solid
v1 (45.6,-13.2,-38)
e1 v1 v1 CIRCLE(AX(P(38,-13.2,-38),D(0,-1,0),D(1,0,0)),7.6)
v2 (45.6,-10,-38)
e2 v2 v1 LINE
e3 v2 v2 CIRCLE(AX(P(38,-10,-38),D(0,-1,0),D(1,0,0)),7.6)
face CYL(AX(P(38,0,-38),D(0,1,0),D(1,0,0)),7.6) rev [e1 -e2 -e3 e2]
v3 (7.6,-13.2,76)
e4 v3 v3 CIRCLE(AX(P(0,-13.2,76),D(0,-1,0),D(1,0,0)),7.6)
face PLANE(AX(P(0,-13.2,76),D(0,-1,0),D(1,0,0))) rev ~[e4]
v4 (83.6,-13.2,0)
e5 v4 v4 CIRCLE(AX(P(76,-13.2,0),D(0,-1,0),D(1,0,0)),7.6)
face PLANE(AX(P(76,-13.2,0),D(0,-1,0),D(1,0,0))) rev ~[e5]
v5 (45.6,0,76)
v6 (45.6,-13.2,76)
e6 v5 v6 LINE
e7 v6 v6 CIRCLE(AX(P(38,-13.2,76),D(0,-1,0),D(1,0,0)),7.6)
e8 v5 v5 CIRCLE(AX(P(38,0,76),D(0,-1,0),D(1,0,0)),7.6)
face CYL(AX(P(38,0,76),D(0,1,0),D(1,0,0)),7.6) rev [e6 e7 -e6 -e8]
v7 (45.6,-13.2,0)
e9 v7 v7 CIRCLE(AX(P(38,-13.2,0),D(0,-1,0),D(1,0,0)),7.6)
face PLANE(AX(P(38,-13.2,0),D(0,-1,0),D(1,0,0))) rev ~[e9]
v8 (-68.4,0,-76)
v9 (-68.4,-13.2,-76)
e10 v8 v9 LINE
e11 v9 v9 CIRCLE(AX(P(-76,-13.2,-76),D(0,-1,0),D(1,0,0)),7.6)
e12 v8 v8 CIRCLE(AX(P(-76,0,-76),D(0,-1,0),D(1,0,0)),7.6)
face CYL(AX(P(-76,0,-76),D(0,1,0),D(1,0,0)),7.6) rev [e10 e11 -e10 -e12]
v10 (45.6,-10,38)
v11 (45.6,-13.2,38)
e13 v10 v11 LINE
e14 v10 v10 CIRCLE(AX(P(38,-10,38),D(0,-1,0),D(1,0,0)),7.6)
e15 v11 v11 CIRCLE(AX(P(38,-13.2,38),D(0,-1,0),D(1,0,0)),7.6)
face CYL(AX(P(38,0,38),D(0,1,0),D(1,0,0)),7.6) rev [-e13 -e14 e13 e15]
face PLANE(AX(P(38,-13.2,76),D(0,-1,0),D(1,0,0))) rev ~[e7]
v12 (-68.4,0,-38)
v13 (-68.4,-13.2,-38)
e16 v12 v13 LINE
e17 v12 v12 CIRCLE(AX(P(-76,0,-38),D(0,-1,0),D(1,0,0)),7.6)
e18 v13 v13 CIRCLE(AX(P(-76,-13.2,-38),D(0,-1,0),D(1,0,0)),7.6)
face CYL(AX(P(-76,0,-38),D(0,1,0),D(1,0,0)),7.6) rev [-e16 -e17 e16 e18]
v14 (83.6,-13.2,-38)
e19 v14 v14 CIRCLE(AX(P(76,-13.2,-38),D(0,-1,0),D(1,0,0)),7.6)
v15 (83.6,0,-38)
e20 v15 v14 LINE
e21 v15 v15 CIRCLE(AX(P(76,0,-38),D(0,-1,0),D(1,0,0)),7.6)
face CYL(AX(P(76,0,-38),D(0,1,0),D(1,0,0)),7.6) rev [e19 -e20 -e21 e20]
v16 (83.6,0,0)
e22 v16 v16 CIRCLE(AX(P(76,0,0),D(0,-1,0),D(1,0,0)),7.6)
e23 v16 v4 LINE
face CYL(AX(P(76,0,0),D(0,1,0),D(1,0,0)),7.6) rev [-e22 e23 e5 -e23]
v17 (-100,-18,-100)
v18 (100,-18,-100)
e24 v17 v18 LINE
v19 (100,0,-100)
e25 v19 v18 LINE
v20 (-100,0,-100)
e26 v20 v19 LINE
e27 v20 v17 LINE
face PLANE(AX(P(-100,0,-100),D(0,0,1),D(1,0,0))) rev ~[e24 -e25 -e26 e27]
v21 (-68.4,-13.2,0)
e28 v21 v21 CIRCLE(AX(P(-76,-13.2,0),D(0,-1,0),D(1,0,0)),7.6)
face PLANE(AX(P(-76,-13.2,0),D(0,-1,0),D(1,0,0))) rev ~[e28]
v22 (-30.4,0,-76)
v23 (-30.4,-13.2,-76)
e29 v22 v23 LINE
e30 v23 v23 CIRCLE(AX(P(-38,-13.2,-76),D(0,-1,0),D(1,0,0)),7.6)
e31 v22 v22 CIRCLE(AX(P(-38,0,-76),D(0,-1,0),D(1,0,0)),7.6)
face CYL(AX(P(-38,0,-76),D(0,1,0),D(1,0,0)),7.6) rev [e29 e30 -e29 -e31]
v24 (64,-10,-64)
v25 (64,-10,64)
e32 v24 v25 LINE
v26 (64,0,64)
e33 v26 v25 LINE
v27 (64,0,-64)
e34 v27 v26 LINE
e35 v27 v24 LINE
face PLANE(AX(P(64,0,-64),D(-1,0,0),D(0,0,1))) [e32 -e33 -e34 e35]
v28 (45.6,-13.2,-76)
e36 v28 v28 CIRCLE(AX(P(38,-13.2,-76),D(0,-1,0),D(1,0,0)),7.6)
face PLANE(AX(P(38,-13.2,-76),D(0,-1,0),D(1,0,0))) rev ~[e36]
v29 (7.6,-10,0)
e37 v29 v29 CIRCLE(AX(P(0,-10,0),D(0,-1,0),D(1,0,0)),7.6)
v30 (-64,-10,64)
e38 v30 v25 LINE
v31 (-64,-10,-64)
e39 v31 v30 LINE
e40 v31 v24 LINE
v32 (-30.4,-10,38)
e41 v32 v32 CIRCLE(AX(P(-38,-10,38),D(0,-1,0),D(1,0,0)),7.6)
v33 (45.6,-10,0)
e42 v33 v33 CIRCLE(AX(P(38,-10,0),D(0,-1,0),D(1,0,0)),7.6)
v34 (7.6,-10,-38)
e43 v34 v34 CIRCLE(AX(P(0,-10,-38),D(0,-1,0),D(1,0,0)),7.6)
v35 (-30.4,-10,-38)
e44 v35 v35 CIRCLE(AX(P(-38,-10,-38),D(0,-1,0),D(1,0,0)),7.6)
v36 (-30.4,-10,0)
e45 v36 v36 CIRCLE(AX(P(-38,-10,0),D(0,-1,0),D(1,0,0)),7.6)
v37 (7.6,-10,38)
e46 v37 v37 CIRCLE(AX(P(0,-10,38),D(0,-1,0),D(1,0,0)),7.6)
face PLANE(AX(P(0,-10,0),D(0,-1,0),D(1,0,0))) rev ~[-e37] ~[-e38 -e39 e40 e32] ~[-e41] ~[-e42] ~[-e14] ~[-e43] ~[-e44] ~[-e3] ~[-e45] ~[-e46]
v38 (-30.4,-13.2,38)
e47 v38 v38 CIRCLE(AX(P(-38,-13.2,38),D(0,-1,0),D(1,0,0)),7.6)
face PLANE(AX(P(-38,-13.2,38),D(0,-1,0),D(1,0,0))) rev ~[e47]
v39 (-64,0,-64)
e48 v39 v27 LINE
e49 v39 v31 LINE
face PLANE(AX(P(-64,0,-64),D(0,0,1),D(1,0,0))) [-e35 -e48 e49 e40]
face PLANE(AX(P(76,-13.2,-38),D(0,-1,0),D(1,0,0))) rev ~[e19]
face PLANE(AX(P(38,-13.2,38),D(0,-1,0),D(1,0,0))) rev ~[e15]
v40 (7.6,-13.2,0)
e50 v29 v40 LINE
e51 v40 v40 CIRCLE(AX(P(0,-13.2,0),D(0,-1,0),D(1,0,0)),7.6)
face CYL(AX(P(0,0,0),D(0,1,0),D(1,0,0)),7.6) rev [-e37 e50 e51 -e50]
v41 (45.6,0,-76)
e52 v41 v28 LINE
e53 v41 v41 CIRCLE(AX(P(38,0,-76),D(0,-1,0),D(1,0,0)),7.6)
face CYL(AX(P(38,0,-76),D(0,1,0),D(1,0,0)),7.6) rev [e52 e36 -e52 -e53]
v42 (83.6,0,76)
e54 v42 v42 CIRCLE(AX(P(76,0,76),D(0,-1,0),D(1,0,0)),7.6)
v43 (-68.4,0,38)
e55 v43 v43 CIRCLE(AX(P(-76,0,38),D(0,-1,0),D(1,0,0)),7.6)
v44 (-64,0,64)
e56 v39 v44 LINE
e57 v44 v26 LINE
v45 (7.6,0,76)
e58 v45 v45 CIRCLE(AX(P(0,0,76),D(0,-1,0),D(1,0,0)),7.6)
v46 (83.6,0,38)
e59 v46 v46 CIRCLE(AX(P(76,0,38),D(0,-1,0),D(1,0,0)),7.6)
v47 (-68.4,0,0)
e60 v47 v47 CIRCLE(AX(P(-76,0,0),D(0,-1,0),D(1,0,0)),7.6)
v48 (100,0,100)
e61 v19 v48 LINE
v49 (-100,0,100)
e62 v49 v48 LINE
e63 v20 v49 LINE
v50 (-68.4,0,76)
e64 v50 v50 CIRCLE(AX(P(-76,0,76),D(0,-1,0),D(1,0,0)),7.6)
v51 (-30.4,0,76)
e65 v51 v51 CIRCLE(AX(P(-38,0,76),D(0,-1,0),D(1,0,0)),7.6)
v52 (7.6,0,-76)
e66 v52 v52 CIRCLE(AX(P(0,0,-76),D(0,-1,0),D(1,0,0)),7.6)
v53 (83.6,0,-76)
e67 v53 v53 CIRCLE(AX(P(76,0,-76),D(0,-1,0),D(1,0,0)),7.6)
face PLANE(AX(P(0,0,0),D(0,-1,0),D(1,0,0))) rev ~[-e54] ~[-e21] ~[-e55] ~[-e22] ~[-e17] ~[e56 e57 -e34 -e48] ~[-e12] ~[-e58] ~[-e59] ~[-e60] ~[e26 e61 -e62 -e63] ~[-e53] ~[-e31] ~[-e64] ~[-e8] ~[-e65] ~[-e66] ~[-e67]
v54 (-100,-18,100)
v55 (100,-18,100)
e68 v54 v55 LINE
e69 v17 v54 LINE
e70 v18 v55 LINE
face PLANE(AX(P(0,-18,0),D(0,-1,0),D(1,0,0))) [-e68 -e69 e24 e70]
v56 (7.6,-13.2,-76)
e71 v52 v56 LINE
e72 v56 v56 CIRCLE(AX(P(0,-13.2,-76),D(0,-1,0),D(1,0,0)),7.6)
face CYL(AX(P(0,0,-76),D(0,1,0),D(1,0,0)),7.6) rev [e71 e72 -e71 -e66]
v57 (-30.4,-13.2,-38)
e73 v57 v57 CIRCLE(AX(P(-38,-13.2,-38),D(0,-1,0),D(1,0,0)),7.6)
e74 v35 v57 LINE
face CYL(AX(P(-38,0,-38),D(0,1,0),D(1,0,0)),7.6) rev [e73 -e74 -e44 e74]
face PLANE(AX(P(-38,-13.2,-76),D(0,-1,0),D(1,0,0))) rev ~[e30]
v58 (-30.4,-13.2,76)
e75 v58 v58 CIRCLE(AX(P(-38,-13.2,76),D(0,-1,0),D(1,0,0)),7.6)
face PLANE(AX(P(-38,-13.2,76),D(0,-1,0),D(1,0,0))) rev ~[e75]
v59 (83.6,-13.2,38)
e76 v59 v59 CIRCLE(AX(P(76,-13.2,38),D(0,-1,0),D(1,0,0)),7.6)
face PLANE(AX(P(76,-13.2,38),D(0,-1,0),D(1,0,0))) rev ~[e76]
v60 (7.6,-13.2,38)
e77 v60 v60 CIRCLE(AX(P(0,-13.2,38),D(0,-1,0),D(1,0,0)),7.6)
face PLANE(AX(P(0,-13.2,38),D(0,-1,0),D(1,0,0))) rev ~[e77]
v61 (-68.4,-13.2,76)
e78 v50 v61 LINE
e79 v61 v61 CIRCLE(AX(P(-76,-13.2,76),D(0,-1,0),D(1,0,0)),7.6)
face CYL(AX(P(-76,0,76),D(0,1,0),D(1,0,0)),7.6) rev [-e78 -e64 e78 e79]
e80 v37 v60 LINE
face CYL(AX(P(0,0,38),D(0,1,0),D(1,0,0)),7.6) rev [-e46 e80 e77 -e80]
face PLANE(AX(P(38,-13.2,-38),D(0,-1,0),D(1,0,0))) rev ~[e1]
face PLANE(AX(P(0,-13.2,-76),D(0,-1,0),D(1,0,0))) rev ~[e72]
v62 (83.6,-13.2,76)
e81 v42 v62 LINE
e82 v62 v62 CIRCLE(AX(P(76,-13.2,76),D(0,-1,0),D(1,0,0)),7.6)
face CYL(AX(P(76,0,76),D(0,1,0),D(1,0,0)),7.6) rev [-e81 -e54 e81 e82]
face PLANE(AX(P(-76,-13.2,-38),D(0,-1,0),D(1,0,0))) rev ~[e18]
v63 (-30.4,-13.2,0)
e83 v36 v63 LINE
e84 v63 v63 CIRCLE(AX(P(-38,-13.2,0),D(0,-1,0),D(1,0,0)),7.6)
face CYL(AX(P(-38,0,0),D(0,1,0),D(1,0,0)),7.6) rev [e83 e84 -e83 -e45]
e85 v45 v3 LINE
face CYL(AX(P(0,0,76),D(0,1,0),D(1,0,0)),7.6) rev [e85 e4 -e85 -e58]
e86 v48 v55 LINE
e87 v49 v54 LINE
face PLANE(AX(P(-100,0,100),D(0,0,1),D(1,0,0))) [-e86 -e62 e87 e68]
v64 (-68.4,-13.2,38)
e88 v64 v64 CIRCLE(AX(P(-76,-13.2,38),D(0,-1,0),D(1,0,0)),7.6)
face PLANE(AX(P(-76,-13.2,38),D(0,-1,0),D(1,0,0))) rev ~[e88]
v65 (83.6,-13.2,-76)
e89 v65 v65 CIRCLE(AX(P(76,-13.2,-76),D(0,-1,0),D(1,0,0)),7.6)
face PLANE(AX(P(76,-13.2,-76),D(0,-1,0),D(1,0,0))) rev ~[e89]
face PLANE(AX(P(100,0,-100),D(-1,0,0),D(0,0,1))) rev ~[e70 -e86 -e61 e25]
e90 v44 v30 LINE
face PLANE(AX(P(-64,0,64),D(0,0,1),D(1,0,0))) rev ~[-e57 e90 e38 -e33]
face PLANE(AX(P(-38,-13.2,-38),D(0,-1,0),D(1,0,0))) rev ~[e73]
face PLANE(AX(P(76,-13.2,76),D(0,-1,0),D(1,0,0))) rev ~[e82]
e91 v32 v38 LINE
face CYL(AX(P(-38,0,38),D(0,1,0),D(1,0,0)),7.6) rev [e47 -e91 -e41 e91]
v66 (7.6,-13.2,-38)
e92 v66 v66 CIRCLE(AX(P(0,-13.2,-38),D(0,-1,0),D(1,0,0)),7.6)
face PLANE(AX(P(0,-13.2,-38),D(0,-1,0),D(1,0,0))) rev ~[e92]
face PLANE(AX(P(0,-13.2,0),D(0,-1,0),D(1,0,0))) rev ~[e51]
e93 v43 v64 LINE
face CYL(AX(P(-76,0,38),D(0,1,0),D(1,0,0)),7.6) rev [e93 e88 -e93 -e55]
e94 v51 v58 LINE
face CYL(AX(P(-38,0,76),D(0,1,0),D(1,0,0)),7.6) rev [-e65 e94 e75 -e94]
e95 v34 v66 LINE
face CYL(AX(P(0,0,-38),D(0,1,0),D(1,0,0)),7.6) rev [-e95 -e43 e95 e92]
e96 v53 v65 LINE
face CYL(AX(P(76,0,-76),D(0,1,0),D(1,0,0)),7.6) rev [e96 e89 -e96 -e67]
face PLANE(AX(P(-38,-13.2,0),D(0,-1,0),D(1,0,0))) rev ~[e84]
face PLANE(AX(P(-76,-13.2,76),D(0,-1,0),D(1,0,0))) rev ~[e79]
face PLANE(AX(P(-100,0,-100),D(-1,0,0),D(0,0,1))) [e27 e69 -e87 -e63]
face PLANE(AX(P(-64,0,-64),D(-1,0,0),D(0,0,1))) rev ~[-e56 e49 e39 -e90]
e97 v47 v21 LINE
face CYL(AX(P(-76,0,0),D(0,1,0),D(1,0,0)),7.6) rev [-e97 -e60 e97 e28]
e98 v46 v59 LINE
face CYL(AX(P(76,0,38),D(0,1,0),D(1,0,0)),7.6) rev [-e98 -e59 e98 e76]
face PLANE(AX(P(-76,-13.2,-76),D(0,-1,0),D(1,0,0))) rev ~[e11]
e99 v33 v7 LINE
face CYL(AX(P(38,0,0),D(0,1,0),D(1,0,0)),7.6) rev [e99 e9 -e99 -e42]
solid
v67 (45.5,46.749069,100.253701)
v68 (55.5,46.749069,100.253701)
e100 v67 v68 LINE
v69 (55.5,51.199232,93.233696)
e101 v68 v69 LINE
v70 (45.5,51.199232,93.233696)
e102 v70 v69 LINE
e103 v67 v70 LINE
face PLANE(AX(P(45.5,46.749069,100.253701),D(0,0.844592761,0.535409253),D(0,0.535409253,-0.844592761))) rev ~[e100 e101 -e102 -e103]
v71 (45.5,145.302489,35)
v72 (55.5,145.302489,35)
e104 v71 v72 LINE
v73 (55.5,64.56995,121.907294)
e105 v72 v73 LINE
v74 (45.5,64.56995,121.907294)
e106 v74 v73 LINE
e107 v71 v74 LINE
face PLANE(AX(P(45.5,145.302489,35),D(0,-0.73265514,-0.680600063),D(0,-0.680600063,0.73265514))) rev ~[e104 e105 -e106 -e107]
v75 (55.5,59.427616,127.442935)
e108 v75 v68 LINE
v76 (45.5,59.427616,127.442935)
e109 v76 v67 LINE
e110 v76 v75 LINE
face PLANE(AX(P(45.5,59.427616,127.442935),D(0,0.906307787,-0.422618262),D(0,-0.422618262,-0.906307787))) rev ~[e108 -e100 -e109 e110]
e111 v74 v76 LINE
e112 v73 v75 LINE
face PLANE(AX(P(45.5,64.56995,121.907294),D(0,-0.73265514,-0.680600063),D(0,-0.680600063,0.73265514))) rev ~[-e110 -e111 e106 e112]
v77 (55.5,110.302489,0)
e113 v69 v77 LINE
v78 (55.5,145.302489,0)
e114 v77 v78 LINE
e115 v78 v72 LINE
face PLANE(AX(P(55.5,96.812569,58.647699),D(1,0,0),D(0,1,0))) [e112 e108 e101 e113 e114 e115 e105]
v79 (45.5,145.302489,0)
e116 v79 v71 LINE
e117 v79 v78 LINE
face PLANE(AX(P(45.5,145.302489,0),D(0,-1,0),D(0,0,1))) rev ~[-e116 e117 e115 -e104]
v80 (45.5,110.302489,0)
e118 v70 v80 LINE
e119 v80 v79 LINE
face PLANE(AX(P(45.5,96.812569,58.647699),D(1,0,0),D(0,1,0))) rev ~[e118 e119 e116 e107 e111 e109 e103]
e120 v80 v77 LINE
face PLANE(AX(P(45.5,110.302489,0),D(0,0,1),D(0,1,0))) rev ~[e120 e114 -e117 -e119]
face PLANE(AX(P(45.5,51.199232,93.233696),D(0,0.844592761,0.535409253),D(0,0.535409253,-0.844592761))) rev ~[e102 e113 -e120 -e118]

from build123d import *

# Parameters (mm, degrees)
F0_W     = 200
F0_H     = 200
F0_R     = 7.6
F0_W_2   = 128
F0_H_2   = 128
F1_DEPTH = 18
F2_DEPTH = 10
F3_DEPTH = 13.2
F5_START = 45.5
F5_DEPTH = 10


# Not quite as in the source:
# - a feature names something its author has since deleted; it is built from what else it names


with BuildPart() as f1:
    # F0 (on Front) → F1 (new body)
    with BuildSketch(Plane.XZ):
        Rectangle(F0_W, F0_H)
        with Locations((-76, -76)):
            Circle(F0_R, mode=Mode.SUBTRACT)
        with Locations((-38, -76)):
            Circle(F0_R, mode=Mode.SUBTRACT)
        with Locations((-76, -38)):
            Circle(F0_R, mode=Mode.SUBTRACT)
        with Locations((0, -76)):
            Circle(F0_R, mode=Mode.SUBTRACT)
        with Locations((38, -76)):
            Circle(F0_R, mode=Mode.SUBTRACT)
        with Locations((76, -76)):
            Circle(F0_R, mode=Mode.SUBTRACT)
        with Locations((76, -38)):
            Circle(F0_R, mode=Mode.SUBTRACT)
        with Locations((-76, 0)):
            Circle(F0_R, mode=Mode.SUBTRACT)
        with Locations((-76, 38)):
            Circle(F0_R, mode=Mode.SUBTRACT)
        with Locations((-76, 76)):
            Circle(F0_R, mode=Mode.SUBTRACT)
        with Locations((-38, 76)):
            Circle(F0_R, mode=Mode.SUBTRACT)
        Rectangle(F0_W_2, F0_H_2, mode=Mode.SUBTRACT)
        with Locations((76, 0)):
            Circle(F0_R, mode=Mode.SUBTRACT)
        with Locations((76, 38)):
            Circle(F0_R, mode=Mode.SUBTRACT)
        with Locations((0, 76)):
            Circle(F0_R, mode=Mode.SUBTRACT)
        with Locations((38, 76)):
            Circle(F0_R, mode=Mode.SUBTRACT)
        with Locations((76, 76)):
            Circle(F0_R, mode=Mode.SUBTRACT)
        Rectangle(F0_W_2, F0_H_2)
        with Locations((-38, -38)):
            Circle(F0_R, mode=Mode.SUBTRACT)
        with Locations((0, -38)):
            Circle(F0_R, mode=Mode.SUBTRACT)
        with Locations((38, -38)):
            Circle(F0_R, mode=Mode.SUBTRACT)
        with Locations((-38, 0)):
            Circle(F0_R, mode=Mode.SUBTRACT)
        with Locations((-38, 38)):
            Circle(F0_R, mode=Mode.SUBTRACT)
        Circle(F0_R, mode=Mode.SUBTRACT)
        with Locations((38, 0)):
            Circle(F0_R, mode=Mode.SUBTRACT)
        with Locations((0, 38)):
            Circle(F0_R, mode=Mode.SUBTRACT)
        with Locations((38, 38)):
            Circle(F0_R, mode=Mode.SUBTRACT)
        with Locations((-76, 76)):
            Circle(F0_R)
        with Locations((-76, 38)):
            Circle(F0_R)
        with Locations((-76, 0)):
            Circle(F0_R)
        with Locations((-76, -38)):
            Circle(F0_R)
        with Locations((-76, -76)):
            Circle(F0_R)
        with Locations((-38, -76)):
            Circle(F0_R)
        with Locations((-38, -38)):
            Circle(F0_R)
        with Locations((-38, 0)):
            Circle(F0_R)
        Circle(F0_R)
        with Locations((0, 38)):
            Circle(F0_R)
        with Locations((0, 76)):
            Circle(F0_R)
        with Locations((38, 76)):
            Circle(F0_R)
        with Locations((38, 38)):
            Circle(F0_R)
        with Locations((38, 0)):
            Circle(F0_R)
        with Locations((38, -38)):
            Circle(F0_R)
        with Locations((38, -76)):
            Circle(F0_R)
        with Locations((76, -76)):
            Circle(F0_R)
        with Locations((76, -38)):
            Circle(F0_R)
        with Locations((76, 38)):
            Circle(F0_R)
        with Locations((76, 76)):
            Circle(F0_R)
        with Locations((-38, 76)):
            Circle(F0_R)
        with Locations((0, -38)):
            Circle(F0_R)
        with Locations((0, -76)):
            Circle(F0_R)
        with Locations((76, 0)):
            Circle(F0_R)
        with Locations((-38, 38)):
            Circle(F0_R)
    extrude(amount=F1_DEPTH)

    # F0 (on Front) → F2 (cut)
    with BuildSketch(Plane.XZ):
        Rectangle(F0_W_2, F0_H_2)
        with Locations((-38, -38)):
            Circle(F0_R, mode=Mode.SUBTRACT)
        with Locations((0, -38)):
            Circle(F0_R, mode=Mode.SUBTRACT)
        with Locations((38, -38)):
            Circle(F0_R, mode=Mode.SUBTRACT)
        with Locations((-38, 0)):
            Circle(F0_R, mode=Mode.SUBTRACT)
        with Locations((-38, 38)):
            Circle(F0_R, mode=Mode.SUBTRACT)
        Circle(F0_R, mode=Mode.SUBTRACT)
        with Locations((38, 0)):
            Circle(F0_R, mode=Mode.SUBTRACT)
        with Locations((0, 38)):
            Circle(F0_R, mode=Mode.SUBTRACT)
        with Locations((38, 38)):
            Circle(F0_R, mode=Mode.SUBTRACT)
    extrude(amount=F2_DEPTH, mode=Mode.SUBTRACT)

    # F0 (on Front) → F3 (cut)
    with BuildSketch(Plane.XZ):
        with Locations((76, 76)):
            Circle(F0_R)
        with Locations((38, 76)):
            Circle(F0_R)
        with Locations((38, 38)):
            Circle(F0_R)
        with Locations((76, 38)):
            Circle(F0_R)
        with Locations((76, 0)):
            Circle(F0_R)
        with Locations((76, -38)):
            Circle(F0_R)
        with Locations((38, -38)):
            Circle(F0_R)
        with Locations((38, 0)):
            Circle(F0_R)
        with Locations((76, -76)):
            Circle(F0_R)
        with Locations((38, -76)):
            Circle(F0_R)
        with Locations((0, -76)):
            Circle(F0_R)
        with Locations((0, -38)):
            Circle(F0_R)
        Circle(F0_R)
        with Locations((0, 38)):
            Circle(F0_R)
        with Locations((-38, 76)):
            Circle(F0_R)
        with Locations((0, 76)):
            Circle(F0_R)
        with Locations((-38, 38)):
            Circle(F0_R)
        with Locations((-38, 0)):
            Circle(F0_R)
        with Locations((-38, -38)):
            Circle(F0_R)
        with Locations((-38, -76)):
            Circle(F0_R)
        with Locations((-76, -76)):
            Circle(F0_R)
        with Locations((-76, -38)):
            Circle(F0_R)
        with Locations((-76, 0)):
            Circle(F0_R)
        with Locations((-76, 38)):
            Circle(F0_R)
        with Locations((-76, 76)):
            Circle(F0_R)
    extrude(amount=F3_DEPTH, mode=Mode.SUBTRACT)


with BuildPart() as f5:
    # F4 (on Right) → F5 (new body)
    with BuildSketch(Plane.YZ.offset(F5_START)):
        Polygon((59.4276164012, 127.4429346418), (46.749068549, 100.2537010307), (51.1992318351, 93.233695913), (110.3024893999, 0), (145.3024893999, 0), (145.3024893999, 35), (64.5699502421, 121.907294069), align=None)
    extrude(amount=F5_DEPTH)


solid = Compound([f1.part, f5.part])
